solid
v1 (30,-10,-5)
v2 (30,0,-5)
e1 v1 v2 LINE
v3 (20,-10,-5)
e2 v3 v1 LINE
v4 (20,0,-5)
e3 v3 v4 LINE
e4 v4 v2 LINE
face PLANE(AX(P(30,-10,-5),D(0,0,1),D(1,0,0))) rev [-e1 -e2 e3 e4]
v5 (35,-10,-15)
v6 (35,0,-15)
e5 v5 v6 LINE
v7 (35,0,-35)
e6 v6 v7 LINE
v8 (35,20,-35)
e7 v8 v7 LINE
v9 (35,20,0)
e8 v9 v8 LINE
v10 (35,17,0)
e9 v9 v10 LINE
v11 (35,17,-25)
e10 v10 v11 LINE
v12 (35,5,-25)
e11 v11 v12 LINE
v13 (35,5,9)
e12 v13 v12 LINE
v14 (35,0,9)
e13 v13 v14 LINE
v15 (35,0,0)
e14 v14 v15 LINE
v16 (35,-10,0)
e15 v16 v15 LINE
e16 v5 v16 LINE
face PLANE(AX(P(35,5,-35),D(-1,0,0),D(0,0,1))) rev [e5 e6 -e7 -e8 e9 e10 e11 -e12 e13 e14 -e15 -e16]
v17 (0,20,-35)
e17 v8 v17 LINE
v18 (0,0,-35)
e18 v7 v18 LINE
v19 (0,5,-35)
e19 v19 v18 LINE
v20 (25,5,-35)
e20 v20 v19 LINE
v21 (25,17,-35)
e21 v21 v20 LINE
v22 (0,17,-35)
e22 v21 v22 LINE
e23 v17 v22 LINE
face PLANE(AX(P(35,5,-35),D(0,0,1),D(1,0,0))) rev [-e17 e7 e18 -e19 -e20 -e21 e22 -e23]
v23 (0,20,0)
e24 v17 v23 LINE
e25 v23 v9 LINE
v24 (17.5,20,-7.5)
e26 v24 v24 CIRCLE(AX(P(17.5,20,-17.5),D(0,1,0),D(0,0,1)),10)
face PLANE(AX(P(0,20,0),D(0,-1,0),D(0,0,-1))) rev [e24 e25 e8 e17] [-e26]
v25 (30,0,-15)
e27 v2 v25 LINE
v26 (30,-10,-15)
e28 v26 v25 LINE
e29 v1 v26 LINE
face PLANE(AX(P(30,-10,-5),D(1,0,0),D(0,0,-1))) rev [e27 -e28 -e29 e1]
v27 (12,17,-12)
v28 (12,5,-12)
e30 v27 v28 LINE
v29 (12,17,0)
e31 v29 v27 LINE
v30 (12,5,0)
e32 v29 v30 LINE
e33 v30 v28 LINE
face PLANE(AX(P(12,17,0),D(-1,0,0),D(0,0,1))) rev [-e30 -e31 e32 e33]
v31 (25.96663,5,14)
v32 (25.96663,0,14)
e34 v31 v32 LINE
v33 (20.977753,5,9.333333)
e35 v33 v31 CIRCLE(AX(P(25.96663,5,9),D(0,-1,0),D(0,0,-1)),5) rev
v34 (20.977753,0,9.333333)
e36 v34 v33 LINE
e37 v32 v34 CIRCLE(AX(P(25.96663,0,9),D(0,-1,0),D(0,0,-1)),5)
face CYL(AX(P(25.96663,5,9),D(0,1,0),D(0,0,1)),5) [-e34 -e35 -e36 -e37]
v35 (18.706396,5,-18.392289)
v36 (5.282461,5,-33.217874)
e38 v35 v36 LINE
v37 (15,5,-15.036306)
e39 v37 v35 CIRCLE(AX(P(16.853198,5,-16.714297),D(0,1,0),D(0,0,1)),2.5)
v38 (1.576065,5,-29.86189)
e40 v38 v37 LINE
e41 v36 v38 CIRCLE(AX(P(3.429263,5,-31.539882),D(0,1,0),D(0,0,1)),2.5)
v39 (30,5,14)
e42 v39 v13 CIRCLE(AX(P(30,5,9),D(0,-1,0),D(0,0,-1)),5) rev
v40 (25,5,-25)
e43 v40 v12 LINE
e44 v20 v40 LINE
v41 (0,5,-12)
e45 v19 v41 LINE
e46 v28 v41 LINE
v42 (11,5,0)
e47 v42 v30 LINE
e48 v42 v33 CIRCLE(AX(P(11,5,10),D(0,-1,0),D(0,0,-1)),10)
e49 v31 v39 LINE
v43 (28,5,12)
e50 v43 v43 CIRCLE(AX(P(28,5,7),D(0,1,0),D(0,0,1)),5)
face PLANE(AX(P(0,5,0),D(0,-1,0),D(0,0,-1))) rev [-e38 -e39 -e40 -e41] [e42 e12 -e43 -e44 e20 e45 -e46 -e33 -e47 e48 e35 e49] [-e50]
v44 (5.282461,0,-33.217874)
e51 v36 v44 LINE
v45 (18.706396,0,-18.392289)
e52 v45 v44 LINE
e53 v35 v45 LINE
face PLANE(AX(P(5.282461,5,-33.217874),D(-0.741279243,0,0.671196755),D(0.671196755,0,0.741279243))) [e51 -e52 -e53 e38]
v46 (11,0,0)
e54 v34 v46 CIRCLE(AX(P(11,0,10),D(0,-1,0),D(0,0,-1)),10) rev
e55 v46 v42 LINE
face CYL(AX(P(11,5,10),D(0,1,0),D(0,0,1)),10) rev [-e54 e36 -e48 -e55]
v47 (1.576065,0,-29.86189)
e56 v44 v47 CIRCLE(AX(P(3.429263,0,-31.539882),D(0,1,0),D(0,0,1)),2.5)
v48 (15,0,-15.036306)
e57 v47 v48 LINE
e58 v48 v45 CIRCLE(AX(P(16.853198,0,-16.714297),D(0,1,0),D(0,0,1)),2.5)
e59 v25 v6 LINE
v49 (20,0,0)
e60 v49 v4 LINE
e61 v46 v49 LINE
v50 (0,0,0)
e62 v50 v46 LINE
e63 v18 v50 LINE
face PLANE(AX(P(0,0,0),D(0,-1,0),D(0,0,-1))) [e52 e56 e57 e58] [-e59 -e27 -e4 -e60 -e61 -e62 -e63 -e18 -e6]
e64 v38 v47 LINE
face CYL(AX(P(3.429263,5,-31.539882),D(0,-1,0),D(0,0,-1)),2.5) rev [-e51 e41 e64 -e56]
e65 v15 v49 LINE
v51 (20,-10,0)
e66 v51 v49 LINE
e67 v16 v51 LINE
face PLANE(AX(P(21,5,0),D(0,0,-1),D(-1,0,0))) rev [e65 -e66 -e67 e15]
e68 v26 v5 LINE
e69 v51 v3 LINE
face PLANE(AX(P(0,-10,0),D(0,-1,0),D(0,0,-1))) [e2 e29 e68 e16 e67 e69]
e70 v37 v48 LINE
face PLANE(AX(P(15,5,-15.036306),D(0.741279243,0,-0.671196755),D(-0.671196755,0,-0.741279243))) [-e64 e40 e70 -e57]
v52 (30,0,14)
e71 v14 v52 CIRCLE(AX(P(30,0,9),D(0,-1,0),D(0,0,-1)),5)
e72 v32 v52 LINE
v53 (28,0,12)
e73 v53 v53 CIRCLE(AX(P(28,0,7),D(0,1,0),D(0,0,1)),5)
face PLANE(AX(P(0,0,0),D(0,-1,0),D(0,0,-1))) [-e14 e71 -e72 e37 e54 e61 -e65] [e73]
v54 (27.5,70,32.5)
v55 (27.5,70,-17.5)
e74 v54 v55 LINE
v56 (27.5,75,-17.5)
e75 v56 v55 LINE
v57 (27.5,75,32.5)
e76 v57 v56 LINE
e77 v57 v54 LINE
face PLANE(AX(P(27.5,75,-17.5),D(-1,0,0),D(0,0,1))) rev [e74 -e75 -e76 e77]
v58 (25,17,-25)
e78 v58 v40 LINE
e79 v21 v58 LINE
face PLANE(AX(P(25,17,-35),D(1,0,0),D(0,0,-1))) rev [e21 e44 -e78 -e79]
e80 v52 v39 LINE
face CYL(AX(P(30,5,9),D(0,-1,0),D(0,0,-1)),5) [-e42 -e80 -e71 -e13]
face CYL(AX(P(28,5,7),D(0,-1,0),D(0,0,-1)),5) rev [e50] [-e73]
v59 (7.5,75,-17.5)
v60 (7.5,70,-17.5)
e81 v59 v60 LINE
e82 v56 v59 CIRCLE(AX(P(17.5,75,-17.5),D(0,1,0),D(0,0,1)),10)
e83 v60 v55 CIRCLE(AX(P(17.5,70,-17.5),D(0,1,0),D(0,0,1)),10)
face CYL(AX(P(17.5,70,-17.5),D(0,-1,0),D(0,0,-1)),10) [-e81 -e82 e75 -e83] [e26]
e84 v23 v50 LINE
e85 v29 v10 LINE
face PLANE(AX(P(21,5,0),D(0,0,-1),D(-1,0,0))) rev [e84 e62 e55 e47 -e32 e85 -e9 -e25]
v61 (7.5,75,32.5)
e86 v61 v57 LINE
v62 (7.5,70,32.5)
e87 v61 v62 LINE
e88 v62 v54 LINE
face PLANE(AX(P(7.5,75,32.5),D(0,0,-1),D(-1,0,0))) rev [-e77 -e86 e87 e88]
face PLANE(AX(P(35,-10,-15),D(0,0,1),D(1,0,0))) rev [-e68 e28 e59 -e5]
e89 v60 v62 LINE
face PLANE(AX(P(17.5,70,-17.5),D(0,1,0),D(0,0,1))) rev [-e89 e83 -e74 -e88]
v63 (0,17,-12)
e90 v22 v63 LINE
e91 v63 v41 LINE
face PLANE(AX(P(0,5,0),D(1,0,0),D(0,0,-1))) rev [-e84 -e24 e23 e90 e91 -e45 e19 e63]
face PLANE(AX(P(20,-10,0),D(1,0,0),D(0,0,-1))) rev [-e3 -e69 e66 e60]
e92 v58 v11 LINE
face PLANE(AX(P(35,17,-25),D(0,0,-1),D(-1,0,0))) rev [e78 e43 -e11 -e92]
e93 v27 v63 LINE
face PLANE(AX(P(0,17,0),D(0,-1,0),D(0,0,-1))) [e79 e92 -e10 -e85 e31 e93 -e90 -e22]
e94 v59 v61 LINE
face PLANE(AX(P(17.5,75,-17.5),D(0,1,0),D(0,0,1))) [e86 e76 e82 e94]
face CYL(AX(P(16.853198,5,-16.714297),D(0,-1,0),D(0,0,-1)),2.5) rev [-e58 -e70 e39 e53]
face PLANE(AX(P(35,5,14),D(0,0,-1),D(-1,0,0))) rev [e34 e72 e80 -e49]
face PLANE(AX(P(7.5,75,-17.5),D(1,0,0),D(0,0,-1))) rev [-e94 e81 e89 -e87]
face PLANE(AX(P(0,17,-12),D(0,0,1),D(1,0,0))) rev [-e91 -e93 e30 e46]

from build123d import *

# Parameters (mm, degrees)
SKETCH1_R           = 5
BOSS_EXTRUDE1_DEPTH = 5
BOSS_EXTRUDE2_DEPTH = 10
SKETCH3_W           = 12
SKETCH3_H           = 12
SKETCH3_W_2         = 10
SKETCH3_H_2         = 10
BOSS_EXTRUDE3_DEPTH = 12
SKETCH4_W           = 35
SKETCH4_H           = 35
BOSS_EXTRUDE4_DEPTH = 3
SKETCH5_R           = 10
BOSS_EXTRUDE5_DEPTH = 50
BOSS_EXTRUDE6_DEPTH = 5
FILLET1_R           = 10
FILLET4_R           = 5


with BuildPart() as part:
    # Sketch1 → Boss-Extrude1 (new body)
    with BuildSketch(Plane(origin=(0, 0, 0), x_dir=(1, 0, 0), z_dir=(0, 1, 0))):
        Polygon((0, 0), (0, 35), (35, 35), (35, 0), (35, -14), (21, -14), (21, 0), align=None)
        with Locations(Location((28, -7, 0), (0, 0, 270))):
            Circle(SKETCH1_R, mode=Mode.SUBTRACT)
        with BuildLine():
            Line((5.28246111, 33.217874153), (18.706396214, 18.392289297))
            ThreePointArc((18.706396214, 18.392289297), (18.531189995, 14.861099302), (15, 15.036305521))
            Line((15, 15.036305521), (1.576064896, 29.861890377))
            ThreePointArc((1.576064896, 29.861890377), (1.751271115, 33.393080372), (5.28246111, 33.217874153))
        make_face(mode=Mode.SUBTRACT)
    extrude(amount=BOSS_EXTRUDE1_DEPTH)

    # Sketch2 → Boss-Extrude2 (add)
    with BuildSketch(Plane.XZ):
        Polygon((30, -5), (20, -5), (20, 0), (35, 0), (35, -15), (30, -15), align=None)
    extrude(amount=BOSS_EXTRUDE2_DEPTH)

    # Sketch3 → Boss-Extrude3 (add)
    with BuildSketch(Plane(origin=(0, 5, 0), x_dir=(1, 0, 0), z_dir=(0, 1, 0))):
        with Locations((6, 6)):
            Rectangle(SKETCH3_W, SKETCH3_H)
        with Locations((30, 30)):
            Rectangle(SKETCH3_W_2, SKETCH3_H_2)
    extrude(amount=BOSS_EXTRUDE3_DEPTH)

    # Sketch4 → Boss-Extrude4 (add)
    with BuildSketch(Plane(origin=(0, 17, 0), x_dir=(1, 0, 0), z_dir=(0, 1, 0))):
        with Locations((17.5, 17.5)):
            Rectangle(SKETCH4_W, SKETCH4_H)
    extrude(amount=BOSS_EXTRUDE4_DEPTH)

    # Sketch5 → Boss-Extrude5 (add)
    with BuildSketch(Plane(origin=(0, 20, 0), x_dir=(1, 0, 0), z_dir=(0, 1, 0))):
        with Locations(Location((17.5, 17.5, 0), (0, 0, 270))):
            Circle(SKETCH5_R)
    extrude(amount=BOSS_EXTRUDE5_DEPTH)

    # Sketch6 → Boss-Extrude6 (add)
    with BuildSketch(Plane(origin=(0, 70, 0), x_dir=(1, 0, 0), z_dir=(0, 1, 0))):
        with BuildLine():
            Line((7.5, 17.5), (7.5, -32.5))
            Line((7.5, -32.5), (27.5, -32.5))
            Line((27.5, -32.5), (27.5, 17.5))
            ThreePointArc((27.5, 17.5), (17.5, 27.5), (7.5, 17.5))
        make_face()
    extrude(amount=BOSS_EXTRUDE6_DEPTH)

    # Fillet1
    # the kernel refuses this fillet: 10 mm, written as the material it adds along each edge
    with BuildSketch(Plane(origin=(21, 0, 0), x_dir=(-1, 0, 0), z_dir=(0, 1, 0))) as fillet1_piece_1:
        with BuildLine():
            CenterArc((FILLET1_R, FILLET1_R), FILLET1_R, 180, 90)
            Line((0, FILLET1_R), (0, 0))
            Line((0, 0), (FILLET1_R, 0))
        make_face()
    extrude(amount=5)

    # Fillet4
    fillet4_edges = [part.edges().sort_by_distance(p)[0] for p in [
        (35, 2.5, 14),
        (21, 2.5, 14),
    ]]
    fillet(fillet4_edges, radius=FILLET4_R)


solid = part.part
